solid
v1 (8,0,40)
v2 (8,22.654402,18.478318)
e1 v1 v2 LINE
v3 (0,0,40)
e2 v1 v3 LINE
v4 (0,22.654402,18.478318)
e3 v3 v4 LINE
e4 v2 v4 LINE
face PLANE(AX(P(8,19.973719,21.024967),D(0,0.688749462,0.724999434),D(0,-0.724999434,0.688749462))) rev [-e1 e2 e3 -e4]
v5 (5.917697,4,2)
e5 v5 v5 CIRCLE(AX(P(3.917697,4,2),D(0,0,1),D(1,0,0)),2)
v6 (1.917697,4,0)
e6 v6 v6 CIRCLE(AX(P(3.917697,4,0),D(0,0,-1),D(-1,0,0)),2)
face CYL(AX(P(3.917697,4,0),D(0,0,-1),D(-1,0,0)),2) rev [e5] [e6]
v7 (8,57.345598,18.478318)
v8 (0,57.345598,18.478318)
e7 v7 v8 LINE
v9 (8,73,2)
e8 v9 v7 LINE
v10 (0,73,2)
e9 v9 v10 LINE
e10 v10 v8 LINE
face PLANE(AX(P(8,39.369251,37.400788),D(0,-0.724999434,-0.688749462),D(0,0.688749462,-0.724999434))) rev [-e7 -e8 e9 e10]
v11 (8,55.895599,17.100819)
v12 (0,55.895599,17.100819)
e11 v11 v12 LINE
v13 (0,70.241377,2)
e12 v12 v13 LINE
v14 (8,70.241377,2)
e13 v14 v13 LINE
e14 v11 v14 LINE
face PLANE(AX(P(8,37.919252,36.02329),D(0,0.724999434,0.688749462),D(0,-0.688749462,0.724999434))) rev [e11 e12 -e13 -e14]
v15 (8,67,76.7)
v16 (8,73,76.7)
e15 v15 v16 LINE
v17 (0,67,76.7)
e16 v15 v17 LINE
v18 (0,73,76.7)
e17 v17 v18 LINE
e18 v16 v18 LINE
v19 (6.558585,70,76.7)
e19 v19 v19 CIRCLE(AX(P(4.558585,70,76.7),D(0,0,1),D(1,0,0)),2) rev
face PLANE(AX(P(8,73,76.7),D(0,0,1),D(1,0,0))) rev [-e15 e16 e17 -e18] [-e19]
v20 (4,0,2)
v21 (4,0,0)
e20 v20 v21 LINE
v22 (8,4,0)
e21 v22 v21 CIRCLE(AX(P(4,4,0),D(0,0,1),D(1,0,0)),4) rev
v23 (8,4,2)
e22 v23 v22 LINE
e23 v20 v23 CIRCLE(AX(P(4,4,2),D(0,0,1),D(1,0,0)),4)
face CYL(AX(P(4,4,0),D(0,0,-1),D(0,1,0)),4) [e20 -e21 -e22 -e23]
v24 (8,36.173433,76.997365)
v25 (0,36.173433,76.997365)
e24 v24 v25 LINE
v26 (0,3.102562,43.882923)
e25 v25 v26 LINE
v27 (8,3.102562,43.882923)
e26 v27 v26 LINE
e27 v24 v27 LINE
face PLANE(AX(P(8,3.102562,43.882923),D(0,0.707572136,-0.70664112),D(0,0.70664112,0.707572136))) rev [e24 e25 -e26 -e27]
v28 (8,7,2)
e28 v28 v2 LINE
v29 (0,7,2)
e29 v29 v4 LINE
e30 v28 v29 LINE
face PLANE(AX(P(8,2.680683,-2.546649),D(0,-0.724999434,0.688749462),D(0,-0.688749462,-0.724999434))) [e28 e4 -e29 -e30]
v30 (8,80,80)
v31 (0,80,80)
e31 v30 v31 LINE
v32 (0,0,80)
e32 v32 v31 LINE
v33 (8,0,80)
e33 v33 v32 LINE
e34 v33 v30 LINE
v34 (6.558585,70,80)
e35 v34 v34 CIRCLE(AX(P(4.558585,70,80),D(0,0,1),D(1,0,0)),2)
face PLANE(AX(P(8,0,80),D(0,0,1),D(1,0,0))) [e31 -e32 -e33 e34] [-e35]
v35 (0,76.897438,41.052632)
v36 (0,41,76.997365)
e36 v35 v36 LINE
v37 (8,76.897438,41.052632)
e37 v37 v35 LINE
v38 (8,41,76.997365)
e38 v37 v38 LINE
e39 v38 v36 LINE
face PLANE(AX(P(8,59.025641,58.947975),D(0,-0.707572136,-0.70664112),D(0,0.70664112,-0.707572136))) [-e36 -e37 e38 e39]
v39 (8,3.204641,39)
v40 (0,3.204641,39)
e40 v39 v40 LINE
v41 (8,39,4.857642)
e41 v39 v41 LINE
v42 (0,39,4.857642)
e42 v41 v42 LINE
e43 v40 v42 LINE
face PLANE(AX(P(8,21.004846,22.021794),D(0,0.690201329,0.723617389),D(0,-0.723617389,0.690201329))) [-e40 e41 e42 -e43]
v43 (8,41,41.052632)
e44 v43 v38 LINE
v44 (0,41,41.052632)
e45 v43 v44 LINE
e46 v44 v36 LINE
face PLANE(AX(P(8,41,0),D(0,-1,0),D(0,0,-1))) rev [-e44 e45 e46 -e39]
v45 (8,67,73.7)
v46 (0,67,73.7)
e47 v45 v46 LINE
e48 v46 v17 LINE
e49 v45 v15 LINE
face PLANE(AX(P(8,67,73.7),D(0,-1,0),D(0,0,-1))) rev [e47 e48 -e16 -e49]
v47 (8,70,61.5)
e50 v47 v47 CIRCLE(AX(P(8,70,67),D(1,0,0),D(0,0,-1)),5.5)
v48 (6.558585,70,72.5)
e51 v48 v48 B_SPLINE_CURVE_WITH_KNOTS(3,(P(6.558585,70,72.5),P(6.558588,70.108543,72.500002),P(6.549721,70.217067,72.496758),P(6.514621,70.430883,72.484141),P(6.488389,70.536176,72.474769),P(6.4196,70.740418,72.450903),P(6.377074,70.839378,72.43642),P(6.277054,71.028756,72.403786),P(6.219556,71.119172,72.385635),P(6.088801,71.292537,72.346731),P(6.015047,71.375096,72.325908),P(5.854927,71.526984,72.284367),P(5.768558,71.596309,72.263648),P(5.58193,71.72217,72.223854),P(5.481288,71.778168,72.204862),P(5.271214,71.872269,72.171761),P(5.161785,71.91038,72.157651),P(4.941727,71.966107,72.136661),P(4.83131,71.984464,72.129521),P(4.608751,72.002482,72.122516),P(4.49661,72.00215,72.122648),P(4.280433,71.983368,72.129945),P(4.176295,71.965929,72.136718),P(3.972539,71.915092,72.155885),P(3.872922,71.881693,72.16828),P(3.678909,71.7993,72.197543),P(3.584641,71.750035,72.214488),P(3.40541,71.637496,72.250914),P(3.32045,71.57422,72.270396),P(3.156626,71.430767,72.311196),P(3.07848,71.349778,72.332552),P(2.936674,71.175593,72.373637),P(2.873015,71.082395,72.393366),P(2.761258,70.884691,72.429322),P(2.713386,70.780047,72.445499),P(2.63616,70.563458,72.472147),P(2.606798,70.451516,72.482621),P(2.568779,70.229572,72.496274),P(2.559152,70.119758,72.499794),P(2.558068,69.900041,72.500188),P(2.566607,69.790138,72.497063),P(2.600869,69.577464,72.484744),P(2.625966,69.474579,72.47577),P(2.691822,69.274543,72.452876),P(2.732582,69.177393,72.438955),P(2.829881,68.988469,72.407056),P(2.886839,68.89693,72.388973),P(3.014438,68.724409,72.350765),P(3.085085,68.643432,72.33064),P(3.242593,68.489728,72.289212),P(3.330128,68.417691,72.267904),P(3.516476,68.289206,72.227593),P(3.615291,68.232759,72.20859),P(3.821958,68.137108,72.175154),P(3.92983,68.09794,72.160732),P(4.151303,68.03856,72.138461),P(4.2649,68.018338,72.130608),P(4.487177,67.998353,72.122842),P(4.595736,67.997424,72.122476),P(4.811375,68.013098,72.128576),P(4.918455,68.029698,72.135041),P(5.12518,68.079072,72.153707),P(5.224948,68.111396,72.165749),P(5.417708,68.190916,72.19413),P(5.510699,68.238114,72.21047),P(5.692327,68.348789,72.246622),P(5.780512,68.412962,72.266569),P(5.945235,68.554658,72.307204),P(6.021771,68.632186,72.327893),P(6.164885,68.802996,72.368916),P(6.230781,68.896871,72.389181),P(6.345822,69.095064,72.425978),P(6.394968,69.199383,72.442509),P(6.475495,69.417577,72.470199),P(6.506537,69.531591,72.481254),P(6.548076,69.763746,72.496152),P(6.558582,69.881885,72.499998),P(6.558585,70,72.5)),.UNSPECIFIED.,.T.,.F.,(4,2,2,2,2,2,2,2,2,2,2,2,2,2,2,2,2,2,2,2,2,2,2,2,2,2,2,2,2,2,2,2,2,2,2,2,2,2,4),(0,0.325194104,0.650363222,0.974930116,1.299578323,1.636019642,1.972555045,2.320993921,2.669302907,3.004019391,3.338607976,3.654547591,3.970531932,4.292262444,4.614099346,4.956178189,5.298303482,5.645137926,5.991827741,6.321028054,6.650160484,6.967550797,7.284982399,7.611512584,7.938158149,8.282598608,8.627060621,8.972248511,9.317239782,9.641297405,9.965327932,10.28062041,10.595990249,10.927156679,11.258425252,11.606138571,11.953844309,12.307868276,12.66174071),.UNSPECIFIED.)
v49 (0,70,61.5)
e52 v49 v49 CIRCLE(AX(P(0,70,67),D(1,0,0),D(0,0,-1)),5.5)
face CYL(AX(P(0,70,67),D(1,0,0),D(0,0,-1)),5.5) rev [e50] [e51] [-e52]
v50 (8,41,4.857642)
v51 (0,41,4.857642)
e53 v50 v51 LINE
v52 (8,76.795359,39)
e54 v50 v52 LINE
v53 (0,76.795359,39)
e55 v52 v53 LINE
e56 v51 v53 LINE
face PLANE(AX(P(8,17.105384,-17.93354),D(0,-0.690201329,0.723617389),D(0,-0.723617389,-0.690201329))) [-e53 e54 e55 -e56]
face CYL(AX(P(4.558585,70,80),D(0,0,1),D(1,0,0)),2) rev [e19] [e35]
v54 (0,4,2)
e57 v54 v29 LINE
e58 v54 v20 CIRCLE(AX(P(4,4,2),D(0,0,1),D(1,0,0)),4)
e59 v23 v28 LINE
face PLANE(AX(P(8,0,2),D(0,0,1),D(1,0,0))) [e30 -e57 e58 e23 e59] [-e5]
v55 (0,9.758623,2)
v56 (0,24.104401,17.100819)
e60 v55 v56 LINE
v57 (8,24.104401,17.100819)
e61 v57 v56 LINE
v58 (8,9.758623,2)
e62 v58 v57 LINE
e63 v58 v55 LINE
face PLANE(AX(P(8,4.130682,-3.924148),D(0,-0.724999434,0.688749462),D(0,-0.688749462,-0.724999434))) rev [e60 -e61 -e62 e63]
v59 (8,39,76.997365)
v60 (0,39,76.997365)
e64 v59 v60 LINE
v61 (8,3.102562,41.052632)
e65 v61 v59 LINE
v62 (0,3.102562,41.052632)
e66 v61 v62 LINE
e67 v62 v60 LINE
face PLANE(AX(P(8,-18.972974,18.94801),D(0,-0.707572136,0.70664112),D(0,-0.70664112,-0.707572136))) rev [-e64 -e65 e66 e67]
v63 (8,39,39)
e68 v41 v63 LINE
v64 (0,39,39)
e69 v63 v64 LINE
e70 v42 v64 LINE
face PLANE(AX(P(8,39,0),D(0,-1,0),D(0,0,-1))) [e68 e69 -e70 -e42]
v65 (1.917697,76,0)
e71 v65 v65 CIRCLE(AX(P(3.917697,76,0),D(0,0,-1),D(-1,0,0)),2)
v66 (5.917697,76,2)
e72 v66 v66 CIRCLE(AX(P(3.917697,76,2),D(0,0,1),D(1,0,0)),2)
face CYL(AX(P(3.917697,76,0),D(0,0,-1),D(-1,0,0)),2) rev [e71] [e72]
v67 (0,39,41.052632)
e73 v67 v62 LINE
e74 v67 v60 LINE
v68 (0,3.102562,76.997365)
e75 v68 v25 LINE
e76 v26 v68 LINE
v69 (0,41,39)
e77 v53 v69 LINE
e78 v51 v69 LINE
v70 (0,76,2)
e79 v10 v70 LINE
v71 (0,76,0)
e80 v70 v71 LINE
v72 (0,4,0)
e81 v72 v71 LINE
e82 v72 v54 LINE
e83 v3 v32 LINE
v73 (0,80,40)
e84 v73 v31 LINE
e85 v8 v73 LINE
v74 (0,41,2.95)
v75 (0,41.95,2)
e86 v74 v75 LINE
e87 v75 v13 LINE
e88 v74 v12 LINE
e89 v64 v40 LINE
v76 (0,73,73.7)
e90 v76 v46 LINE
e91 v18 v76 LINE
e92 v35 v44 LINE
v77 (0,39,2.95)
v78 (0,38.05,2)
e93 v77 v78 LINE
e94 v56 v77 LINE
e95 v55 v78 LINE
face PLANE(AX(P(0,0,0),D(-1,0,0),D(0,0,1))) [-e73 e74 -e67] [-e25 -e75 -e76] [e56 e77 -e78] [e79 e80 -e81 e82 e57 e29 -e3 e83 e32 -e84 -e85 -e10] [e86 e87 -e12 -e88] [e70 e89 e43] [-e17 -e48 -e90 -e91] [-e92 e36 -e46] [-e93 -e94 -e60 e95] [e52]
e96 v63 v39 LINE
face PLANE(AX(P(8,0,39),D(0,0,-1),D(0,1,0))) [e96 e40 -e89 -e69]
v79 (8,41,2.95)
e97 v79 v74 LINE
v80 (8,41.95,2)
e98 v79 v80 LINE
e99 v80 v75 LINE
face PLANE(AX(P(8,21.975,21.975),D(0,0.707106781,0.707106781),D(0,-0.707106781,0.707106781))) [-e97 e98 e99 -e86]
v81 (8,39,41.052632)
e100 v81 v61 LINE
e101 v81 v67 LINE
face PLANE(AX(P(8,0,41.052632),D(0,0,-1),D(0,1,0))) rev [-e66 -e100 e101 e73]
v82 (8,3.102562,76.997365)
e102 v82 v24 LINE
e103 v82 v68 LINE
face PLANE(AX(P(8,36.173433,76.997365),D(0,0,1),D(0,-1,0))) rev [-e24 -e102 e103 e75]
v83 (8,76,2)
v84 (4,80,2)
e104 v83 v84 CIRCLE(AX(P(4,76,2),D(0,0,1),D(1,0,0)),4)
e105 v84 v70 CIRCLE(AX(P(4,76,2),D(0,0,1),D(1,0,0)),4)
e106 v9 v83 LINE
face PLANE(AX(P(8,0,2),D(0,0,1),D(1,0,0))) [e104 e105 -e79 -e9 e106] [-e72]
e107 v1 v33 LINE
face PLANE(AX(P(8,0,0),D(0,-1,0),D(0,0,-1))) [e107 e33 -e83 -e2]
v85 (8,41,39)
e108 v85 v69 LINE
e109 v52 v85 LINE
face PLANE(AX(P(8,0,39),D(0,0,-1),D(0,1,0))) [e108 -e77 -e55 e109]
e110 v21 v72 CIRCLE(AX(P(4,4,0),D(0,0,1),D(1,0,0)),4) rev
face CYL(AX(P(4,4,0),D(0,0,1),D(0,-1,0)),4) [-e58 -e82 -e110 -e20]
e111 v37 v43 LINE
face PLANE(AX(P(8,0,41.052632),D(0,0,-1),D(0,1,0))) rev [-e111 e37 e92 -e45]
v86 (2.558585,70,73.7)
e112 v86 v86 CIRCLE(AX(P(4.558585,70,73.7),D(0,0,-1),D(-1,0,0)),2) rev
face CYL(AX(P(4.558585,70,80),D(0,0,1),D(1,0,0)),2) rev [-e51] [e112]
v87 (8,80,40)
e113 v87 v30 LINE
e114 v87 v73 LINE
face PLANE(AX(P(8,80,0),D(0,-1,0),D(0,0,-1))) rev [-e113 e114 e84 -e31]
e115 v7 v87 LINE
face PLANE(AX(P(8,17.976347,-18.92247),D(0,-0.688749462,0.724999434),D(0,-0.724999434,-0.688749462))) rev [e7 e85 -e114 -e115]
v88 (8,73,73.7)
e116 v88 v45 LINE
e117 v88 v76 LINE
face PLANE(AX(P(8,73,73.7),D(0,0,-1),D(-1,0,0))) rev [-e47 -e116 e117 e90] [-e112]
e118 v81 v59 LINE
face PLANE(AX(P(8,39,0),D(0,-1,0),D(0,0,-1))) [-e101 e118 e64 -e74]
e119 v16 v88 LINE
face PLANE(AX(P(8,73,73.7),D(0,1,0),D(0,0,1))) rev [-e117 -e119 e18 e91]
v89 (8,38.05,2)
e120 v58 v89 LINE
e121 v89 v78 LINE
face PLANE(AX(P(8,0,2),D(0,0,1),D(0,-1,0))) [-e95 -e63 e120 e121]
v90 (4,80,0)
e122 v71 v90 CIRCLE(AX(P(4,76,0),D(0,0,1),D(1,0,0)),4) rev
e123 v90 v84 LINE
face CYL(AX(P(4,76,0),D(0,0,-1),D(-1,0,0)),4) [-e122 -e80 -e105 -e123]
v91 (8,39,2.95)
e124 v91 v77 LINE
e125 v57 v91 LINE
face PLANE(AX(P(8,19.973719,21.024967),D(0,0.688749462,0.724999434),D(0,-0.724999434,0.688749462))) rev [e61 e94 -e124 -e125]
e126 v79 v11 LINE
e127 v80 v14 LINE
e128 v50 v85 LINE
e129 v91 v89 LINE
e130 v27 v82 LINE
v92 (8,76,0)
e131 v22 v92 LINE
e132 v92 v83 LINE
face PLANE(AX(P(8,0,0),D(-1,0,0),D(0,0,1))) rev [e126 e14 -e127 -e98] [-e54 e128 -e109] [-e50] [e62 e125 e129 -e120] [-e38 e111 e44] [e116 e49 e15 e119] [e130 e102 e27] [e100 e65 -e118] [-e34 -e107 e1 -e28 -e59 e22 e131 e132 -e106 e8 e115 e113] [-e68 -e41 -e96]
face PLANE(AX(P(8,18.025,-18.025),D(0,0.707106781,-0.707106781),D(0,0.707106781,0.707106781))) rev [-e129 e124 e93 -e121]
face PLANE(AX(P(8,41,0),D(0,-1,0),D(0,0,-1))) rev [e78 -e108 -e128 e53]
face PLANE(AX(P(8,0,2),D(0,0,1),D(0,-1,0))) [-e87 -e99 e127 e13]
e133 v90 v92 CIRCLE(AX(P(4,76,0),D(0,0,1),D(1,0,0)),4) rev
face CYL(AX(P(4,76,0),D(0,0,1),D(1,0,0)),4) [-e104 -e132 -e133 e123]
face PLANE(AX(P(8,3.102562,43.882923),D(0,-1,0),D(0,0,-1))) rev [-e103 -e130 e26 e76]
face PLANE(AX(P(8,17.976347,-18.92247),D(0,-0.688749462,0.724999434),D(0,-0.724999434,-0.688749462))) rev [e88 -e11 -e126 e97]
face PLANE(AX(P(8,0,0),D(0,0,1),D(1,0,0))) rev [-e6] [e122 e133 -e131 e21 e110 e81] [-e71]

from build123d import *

# Parameters (mm, degrees)
SKETCH1_W                  = 80
SKETCH1_H                  = 80
BOSS_EXTRUDE1_DEPTH        = 8
CUT_EXTRUDE3_DEPTH         = 8
SKETCH5_R                  = 5.5
CUT_EXTRUDE4_DEPTH         = 8
F_4_0MM_DOWEL_HOLE1_D      = 4
F_4_0MM_DOWEL_HOLE1_DEPTH  = 2
F_4_0MM_DOWEL_HOLE2_REACH  = 115.42
F_4_0MM_DOWEL_HOLE2_BORE_R = 2
SKETCH11_W                 = 3
SKETCH11_H                 = 6
CUT_EXTRUDE5_DEPTH         = 8
CUT_EXTRUDE7_DEPTH         = 8
FILLET1_R                  = 4


with BuildPart() as part:
    # Sketch1 → Boss-Extrude1 (new body)
    with BuildSketch(Plane(origin=(0, 0, 0), x_dir=(0, 0, -1), z_dir=(1, 0, 0))):
        with Locations((-40, 40)):
            Rectangle(SKETCH1_W, SKETCH1_H)
    extrude(amount=BOSS_EXTRUDE1_DEPTH)

    # Sketch4 → Cut-Extrude3 (cut)
    with BuildSketch(Plane.ZY):
        Polygon((4.857641634, 41), (39, 76.795358795), (39, 41), align=None)
        Polygon((41.052631579, 76.897437673), (41.052631579, 41), (76.997364954, 41), align=None)
        Polygon((41.052631579, 39), (76.997364954, 39), (41.052631579, 3.102562327), align=None)
        Polygon((39, 39), (39, 3.204641205), (4.857641634, 39), align=None)
        Polygon((2, 7), (2, 0), (40, 0), (18.478318003, 22.654402102), align=None)
        Polygon((2, 9.758622845), (2, 38.05), (2.95, 39), (17.100819079, 24.10440097), align=None)
        Polygon((2, 41.95), (2, 70.241377155), (17.100819079, 55.89559903), (2.95, 41), align=None)
        Polygon((2, 80), (2, 73), (18.478318003, 57.345597898), (40, 80), align=None)
    extrude(amount=-CUT_EXTRUDE3_DEPTH, mode=Mode.SUBTRACT)

    # Sketch5 → Cut-Extrude4 (cut)
    with BuildSketch(Plane(origin=(8, 0, 0), x_dir=(0, 0, -1), z_dir=(1, 0, 0))):
        with Locations((-67, 70)):
            Circle(SKETCH5_R)
    extrude(amount=-CUT_EXTRUDE4_DEPTH, mode=Mode.SUBTRACT)

    # Ø4.0mm Dowel Hole1
    with Locations(Plane(origin=(0, 0, 0), x_dir=(-1, 0, 0), z_dir=(0, 0, -1))):
        with Locations((-3.917697329, 76), (-3.917697329, 4)):
            Hole(F_4_0MM_DOWEL_HOLE1_D / 2, depth=F_4_0MM_DOWEL_HOLE1_DEPTH)

    # Ø4.0mm Dowel Hole2 bore → Ø4.0mm Dowel Hole2 (cut, up to next)
    with BuildSketch(Plane.XY.offset(80), mode=Mode.PRIVATE) as f_4_0mm_dowel_hole2_sk1:
        with Locations((4.558585212, 70)):
            Circle(F_4_0MM_DOWEL_HOLE2_BORE_R)
    f_4_0mm_dowel_hole2_tool1 = extrude(f_4_0mm_dowel_hole2_sk1.sketch, amount=-F_4_0MM_DOWEL_HOLE2_REACH, mode=Mode.PRIVATE) & part.part
    add(f_4_0mm_dowel_hole2_tool1.solids().sort_by_distance((4.558585, 70, 80))[0], mode=Mode.SUBTRACT)

    # Sketch11 → Cut-Extrude5 (cut)
    with BuildSketch(Plane.ZY):
        with Locations((75.2, 70)):
            Rectangle(SKETCH11_W, SKETCH11_H)
    extrude(amount=-CUT_EXTRUDE5_DEPTH, mode=Mode.SUBTRACT)

    # Sketch15 → Cut-Extrude7 (cut)
    with BuildSketch(Plane.ZY):
        Polygon((43.882922576, 3.102562327), (76.997364954, 3.102562327), (76.997364954, 36.17343307), align=None)
    extrude(amount=-CUT_EXTRUDE7_DEPTH, mode=Mode.SUBTRACT)

    # Fillet1
    fillet1_edges = [part.edges().sort_by_distance(p)[0] for p in [
        (8, 0, 1),
        (0, 0, 1),
        (8, 80, 1),
        (0, 80, 1),
    ]]
    fillet(fillet1_edges, radius=FILLET1_R - 0.0001)  # a hair under: the kernel refuses the full size


solid = part.part
